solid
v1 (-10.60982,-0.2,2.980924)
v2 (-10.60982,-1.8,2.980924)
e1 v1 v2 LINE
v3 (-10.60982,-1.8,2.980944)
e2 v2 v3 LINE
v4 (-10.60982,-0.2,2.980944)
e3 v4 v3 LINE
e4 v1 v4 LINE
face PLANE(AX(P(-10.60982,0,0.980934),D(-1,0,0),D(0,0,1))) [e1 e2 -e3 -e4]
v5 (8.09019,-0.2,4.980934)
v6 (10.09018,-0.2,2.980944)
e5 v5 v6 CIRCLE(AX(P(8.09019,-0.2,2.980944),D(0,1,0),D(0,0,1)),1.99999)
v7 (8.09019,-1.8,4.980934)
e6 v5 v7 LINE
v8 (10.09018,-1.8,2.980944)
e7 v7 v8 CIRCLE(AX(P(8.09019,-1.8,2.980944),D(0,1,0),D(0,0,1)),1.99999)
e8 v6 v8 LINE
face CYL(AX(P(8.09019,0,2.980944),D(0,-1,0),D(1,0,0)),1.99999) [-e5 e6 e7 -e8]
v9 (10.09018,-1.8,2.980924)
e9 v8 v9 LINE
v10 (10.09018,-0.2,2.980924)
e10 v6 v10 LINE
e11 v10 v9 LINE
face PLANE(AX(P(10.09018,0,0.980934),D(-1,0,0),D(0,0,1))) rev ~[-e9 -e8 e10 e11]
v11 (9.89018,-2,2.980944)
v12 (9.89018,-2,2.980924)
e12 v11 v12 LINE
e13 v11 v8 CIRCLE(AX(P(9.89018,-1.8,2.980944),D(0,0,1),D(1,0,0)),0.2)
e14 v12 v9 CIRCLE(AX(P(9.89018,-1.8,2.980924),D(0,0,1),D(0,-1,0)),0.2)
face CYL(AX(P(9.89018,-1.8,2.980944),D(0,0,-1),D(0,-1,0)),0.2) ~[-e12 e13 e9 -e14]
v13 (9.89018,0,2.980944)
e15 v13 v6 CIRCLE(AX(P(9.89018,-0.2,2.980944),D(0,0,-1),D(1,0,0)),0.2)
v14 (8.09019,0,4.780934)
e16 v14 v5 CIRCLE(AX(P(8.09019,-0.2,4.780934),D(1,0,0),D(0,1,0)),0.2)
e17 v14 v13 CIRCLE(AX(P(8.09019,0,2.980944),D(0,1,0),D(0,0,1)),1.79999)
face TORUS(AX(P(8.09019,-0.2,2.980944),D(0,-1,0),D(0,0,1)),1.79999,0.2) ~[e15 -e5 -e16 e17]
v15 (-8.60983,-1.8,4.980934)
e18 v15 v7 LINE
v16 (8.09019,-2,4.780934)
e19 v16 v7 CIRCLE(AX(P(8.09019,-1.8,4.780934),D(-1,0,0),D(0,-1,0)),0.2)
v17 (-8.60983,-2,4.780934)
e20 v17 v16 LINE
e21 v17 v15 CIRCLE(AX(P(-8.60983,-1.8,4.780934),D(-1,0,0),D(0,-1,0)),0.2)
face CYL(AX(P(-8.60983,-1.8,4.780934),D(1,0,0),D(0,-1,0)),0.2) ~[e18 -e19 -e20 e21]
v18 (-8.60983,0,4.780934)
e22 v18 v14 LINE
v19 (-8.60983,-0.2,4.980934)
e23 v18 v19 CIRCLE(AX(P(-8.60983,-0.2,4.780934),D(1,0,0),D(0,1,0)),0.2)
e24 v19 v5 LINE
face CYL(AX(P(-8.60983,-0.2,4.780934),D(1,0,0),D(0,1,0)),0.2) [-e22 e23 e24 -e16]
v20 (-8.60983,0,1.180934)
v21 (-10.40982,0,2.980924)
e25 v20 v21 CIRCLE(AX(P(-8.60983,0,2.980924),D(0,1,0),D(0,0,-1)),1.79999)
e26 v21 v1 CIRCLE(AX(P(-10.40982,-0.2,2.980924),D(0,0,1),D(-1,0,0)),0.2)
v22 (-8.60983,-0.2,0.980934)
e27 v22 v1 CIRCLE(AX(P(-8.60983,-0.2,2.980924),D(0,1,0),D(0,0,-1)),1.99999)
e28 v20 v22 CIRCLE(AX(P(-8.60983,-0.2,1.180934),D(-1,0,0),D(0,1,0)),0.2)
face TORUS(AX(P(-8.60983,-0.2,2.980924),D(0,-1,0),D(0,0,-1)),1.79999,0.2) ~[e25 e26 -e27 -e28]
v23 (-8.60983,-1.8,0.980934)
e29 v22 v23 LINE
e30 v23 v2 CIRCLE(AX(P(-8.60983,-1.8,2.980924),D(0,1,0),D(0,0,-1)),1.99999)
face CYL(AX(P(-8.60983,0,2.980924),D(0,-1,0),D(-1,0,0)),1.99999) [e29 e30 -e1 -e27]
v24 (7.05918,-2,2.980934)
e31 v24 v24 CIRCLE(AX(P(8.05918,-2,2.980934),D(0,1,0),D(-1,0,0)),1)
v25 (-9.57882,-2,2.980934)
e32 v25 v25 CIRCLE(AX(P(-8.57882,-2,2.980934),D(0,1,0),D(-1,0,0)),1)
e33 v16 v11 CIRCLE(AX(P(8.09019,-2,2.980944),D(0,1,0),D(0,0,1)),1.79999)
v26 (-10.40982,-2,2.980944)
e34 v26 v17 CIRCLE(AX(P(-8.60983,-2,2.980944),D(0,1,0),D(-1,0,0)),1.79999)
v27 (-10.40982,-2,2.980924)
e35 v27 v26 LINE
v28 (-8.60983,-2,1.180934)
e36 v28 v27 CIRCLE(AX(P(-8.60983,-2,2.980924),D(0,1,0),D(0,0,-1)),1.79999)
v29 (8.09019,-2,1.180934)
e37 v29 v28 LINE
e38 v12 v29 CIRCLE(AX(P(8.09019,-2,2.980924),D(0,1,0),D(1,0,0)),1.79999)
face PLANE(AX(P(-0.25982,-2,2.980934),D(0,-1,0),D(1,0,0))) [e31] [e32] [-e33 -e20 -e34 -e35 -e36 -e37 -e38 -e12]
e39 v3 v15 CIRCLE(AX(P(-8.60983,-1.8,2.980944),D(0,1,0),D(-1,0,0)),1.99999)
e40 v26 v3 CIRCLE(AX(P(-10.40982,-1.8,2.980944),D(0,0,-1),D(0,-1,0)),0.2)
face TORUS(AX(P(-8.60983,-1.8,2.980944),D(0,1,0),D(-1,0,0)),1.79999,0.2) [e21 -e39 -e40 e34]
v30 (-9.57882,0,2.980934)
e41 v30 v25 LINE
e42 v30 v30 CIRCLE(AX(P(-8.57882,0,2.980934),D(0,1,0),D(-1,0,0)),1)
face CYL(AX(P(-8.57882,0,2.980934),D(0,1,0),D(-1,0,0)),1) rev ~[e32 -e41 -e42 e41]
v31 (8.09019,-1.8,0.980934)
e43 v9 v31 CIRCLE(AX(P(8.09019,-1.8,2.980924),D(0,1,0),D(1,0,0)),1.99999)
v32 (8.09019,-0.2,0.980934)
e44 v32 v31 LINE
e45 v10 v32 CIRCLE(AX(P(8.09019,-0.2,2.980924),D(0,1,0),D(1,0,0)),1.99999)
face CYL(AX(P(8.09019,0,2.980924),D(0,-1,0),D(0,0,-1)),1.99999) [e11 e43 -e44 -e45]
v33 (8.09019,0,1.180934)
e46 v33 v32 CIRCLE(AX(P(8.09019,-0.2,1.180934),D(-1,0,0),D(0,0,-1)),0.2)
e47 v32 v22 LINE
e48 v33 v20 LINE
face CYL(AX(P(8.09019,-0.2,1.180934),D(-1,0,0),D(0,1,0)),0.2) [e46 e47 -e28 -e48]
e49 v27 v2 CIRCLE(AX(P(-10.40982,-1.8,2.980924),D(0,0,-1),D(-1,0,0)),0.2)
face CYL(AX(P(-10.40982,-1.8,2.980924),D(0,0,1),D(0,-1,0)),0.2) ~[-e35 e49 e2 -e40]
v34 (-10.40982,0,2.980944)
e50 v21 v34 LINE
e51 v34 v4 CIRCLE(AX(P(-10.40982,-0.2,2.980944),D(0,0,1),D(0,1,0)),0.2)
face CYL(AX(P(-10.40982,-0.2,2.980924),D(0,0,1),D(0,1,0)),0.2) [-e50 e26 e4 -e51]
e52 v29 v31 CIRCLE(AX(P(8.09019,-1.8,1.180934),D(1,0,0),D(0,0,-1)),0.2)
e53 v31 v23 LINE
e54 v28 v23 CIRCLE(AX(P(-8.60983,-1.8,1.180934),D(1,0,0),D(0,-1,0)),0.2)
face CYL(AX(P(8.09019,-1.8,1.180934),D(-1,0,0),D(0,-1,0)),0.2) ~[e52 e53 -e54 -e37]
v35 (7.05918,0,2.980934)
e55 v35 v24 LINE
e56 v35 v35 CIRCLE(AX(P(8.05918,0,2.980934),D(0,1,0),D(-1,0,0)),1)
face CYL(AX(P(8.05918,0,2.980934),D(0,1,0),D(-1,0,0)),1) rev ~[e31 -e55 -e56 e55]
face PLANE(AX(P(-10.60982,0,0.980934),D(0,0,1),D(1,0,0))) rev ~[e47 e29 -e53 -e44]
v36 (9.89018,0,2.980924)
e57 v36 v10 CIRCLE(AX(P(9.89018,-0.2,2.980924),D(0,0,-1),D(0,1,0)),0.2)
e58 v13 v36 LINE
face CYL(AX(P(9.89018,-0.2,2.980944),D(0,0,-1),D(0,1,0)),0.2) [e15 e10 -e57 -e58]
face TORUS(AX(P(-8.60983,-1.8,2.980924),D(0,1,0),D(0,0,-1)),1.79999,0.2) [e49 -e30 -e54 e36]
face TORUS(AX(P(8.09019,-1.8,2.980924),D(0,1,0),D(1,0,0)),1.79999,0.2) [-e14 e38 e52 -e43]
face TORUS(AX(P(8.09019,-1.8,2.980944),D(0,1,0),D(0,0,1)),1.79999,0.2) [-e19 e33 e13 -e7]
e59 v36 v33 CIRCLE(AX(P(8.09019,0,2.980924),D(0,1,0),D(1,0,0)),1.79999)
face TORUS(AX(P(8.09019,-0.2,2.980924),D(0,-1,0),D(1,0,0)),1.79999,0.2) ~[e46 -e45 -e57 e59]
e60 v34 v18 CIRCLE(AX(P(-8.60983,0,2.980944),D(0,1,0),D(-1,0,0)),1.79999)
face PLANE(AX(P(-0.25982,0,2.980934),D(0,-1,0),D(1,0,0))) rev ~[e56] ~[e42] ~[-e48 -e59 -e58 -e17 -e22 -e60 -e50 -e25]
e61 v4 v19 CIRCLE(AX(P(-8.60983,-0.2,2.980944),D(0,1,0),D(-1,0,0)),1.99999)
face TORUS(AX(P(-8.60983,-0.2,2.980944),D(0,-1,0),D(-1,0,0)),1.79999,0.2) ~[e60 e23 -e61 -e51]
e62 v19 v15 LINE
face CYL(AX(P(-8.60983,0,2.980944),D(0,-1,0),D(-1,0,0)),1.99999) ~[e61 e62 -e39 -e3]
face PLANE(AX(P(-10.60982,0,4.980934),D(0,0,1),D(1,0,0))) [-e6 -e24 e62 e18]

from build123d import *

# Parameters (mm, degrees)
F0_W     = 20.7
F0_H     = 4
F1_DEPTH = 2
F2_R     = 1.99999
F3_R     = 0.2
F4_R     = 1
F5_DEPTH = 25


# Not quite as in the source:
# - a fillet or chamfer is up to 0.001 mm smaller than in the source, because OpenCascade refuses the exact size


with BuildPart() as f1:
    # F0 (on Front) → F1 (new body)
    with BuildSketch(Plane.XZ):
        with Locations((-0.2598203719, 2.9809341038)):
            Rectangle(F0_W, F0_H)
    extrude(amount=F1_DEPTH)

    # F2 (radius 2 in the source; OpenCascade refuses exactly that, so slightly less here)
    f2_edges = [f1.edges().sort_by_distance(p)[0] for p in [
        (-10.60982, -1, 4.980934),
        (-10.60982, -1, 0.980934),
        (10.09018, -1, 4.980934),
        (10.09018, -1, 0.980934),
    ]]
    fillet(f2_edges, radius=F2_R)

    # F3
    f3_edges = [f1.edges().sort_by_distance(p)[0] for p in [
        (-0.25982, 0, 4.980934),
        (-0.25982, -2, 4.980934),
    ]]
    fillet(f3_edges, radius=F3_R)

    # F4 (on face) → F5 (cut)
    with BuildSketch(Plane(origin=(0, 0, 0), x_dir=(-1, 0, 0), z_dir=(0, 1, 0))):
        with Locations((8.5788203719, 2.9809341038)):
            Circle(F4_R)
        with Locations((-8.0591796281, 2.9809341038)):
            Circle(F4_R)
    extrude(amount=-F5_DEPTH, mode=Mode.SUBTRACT)


solid = f1.part
